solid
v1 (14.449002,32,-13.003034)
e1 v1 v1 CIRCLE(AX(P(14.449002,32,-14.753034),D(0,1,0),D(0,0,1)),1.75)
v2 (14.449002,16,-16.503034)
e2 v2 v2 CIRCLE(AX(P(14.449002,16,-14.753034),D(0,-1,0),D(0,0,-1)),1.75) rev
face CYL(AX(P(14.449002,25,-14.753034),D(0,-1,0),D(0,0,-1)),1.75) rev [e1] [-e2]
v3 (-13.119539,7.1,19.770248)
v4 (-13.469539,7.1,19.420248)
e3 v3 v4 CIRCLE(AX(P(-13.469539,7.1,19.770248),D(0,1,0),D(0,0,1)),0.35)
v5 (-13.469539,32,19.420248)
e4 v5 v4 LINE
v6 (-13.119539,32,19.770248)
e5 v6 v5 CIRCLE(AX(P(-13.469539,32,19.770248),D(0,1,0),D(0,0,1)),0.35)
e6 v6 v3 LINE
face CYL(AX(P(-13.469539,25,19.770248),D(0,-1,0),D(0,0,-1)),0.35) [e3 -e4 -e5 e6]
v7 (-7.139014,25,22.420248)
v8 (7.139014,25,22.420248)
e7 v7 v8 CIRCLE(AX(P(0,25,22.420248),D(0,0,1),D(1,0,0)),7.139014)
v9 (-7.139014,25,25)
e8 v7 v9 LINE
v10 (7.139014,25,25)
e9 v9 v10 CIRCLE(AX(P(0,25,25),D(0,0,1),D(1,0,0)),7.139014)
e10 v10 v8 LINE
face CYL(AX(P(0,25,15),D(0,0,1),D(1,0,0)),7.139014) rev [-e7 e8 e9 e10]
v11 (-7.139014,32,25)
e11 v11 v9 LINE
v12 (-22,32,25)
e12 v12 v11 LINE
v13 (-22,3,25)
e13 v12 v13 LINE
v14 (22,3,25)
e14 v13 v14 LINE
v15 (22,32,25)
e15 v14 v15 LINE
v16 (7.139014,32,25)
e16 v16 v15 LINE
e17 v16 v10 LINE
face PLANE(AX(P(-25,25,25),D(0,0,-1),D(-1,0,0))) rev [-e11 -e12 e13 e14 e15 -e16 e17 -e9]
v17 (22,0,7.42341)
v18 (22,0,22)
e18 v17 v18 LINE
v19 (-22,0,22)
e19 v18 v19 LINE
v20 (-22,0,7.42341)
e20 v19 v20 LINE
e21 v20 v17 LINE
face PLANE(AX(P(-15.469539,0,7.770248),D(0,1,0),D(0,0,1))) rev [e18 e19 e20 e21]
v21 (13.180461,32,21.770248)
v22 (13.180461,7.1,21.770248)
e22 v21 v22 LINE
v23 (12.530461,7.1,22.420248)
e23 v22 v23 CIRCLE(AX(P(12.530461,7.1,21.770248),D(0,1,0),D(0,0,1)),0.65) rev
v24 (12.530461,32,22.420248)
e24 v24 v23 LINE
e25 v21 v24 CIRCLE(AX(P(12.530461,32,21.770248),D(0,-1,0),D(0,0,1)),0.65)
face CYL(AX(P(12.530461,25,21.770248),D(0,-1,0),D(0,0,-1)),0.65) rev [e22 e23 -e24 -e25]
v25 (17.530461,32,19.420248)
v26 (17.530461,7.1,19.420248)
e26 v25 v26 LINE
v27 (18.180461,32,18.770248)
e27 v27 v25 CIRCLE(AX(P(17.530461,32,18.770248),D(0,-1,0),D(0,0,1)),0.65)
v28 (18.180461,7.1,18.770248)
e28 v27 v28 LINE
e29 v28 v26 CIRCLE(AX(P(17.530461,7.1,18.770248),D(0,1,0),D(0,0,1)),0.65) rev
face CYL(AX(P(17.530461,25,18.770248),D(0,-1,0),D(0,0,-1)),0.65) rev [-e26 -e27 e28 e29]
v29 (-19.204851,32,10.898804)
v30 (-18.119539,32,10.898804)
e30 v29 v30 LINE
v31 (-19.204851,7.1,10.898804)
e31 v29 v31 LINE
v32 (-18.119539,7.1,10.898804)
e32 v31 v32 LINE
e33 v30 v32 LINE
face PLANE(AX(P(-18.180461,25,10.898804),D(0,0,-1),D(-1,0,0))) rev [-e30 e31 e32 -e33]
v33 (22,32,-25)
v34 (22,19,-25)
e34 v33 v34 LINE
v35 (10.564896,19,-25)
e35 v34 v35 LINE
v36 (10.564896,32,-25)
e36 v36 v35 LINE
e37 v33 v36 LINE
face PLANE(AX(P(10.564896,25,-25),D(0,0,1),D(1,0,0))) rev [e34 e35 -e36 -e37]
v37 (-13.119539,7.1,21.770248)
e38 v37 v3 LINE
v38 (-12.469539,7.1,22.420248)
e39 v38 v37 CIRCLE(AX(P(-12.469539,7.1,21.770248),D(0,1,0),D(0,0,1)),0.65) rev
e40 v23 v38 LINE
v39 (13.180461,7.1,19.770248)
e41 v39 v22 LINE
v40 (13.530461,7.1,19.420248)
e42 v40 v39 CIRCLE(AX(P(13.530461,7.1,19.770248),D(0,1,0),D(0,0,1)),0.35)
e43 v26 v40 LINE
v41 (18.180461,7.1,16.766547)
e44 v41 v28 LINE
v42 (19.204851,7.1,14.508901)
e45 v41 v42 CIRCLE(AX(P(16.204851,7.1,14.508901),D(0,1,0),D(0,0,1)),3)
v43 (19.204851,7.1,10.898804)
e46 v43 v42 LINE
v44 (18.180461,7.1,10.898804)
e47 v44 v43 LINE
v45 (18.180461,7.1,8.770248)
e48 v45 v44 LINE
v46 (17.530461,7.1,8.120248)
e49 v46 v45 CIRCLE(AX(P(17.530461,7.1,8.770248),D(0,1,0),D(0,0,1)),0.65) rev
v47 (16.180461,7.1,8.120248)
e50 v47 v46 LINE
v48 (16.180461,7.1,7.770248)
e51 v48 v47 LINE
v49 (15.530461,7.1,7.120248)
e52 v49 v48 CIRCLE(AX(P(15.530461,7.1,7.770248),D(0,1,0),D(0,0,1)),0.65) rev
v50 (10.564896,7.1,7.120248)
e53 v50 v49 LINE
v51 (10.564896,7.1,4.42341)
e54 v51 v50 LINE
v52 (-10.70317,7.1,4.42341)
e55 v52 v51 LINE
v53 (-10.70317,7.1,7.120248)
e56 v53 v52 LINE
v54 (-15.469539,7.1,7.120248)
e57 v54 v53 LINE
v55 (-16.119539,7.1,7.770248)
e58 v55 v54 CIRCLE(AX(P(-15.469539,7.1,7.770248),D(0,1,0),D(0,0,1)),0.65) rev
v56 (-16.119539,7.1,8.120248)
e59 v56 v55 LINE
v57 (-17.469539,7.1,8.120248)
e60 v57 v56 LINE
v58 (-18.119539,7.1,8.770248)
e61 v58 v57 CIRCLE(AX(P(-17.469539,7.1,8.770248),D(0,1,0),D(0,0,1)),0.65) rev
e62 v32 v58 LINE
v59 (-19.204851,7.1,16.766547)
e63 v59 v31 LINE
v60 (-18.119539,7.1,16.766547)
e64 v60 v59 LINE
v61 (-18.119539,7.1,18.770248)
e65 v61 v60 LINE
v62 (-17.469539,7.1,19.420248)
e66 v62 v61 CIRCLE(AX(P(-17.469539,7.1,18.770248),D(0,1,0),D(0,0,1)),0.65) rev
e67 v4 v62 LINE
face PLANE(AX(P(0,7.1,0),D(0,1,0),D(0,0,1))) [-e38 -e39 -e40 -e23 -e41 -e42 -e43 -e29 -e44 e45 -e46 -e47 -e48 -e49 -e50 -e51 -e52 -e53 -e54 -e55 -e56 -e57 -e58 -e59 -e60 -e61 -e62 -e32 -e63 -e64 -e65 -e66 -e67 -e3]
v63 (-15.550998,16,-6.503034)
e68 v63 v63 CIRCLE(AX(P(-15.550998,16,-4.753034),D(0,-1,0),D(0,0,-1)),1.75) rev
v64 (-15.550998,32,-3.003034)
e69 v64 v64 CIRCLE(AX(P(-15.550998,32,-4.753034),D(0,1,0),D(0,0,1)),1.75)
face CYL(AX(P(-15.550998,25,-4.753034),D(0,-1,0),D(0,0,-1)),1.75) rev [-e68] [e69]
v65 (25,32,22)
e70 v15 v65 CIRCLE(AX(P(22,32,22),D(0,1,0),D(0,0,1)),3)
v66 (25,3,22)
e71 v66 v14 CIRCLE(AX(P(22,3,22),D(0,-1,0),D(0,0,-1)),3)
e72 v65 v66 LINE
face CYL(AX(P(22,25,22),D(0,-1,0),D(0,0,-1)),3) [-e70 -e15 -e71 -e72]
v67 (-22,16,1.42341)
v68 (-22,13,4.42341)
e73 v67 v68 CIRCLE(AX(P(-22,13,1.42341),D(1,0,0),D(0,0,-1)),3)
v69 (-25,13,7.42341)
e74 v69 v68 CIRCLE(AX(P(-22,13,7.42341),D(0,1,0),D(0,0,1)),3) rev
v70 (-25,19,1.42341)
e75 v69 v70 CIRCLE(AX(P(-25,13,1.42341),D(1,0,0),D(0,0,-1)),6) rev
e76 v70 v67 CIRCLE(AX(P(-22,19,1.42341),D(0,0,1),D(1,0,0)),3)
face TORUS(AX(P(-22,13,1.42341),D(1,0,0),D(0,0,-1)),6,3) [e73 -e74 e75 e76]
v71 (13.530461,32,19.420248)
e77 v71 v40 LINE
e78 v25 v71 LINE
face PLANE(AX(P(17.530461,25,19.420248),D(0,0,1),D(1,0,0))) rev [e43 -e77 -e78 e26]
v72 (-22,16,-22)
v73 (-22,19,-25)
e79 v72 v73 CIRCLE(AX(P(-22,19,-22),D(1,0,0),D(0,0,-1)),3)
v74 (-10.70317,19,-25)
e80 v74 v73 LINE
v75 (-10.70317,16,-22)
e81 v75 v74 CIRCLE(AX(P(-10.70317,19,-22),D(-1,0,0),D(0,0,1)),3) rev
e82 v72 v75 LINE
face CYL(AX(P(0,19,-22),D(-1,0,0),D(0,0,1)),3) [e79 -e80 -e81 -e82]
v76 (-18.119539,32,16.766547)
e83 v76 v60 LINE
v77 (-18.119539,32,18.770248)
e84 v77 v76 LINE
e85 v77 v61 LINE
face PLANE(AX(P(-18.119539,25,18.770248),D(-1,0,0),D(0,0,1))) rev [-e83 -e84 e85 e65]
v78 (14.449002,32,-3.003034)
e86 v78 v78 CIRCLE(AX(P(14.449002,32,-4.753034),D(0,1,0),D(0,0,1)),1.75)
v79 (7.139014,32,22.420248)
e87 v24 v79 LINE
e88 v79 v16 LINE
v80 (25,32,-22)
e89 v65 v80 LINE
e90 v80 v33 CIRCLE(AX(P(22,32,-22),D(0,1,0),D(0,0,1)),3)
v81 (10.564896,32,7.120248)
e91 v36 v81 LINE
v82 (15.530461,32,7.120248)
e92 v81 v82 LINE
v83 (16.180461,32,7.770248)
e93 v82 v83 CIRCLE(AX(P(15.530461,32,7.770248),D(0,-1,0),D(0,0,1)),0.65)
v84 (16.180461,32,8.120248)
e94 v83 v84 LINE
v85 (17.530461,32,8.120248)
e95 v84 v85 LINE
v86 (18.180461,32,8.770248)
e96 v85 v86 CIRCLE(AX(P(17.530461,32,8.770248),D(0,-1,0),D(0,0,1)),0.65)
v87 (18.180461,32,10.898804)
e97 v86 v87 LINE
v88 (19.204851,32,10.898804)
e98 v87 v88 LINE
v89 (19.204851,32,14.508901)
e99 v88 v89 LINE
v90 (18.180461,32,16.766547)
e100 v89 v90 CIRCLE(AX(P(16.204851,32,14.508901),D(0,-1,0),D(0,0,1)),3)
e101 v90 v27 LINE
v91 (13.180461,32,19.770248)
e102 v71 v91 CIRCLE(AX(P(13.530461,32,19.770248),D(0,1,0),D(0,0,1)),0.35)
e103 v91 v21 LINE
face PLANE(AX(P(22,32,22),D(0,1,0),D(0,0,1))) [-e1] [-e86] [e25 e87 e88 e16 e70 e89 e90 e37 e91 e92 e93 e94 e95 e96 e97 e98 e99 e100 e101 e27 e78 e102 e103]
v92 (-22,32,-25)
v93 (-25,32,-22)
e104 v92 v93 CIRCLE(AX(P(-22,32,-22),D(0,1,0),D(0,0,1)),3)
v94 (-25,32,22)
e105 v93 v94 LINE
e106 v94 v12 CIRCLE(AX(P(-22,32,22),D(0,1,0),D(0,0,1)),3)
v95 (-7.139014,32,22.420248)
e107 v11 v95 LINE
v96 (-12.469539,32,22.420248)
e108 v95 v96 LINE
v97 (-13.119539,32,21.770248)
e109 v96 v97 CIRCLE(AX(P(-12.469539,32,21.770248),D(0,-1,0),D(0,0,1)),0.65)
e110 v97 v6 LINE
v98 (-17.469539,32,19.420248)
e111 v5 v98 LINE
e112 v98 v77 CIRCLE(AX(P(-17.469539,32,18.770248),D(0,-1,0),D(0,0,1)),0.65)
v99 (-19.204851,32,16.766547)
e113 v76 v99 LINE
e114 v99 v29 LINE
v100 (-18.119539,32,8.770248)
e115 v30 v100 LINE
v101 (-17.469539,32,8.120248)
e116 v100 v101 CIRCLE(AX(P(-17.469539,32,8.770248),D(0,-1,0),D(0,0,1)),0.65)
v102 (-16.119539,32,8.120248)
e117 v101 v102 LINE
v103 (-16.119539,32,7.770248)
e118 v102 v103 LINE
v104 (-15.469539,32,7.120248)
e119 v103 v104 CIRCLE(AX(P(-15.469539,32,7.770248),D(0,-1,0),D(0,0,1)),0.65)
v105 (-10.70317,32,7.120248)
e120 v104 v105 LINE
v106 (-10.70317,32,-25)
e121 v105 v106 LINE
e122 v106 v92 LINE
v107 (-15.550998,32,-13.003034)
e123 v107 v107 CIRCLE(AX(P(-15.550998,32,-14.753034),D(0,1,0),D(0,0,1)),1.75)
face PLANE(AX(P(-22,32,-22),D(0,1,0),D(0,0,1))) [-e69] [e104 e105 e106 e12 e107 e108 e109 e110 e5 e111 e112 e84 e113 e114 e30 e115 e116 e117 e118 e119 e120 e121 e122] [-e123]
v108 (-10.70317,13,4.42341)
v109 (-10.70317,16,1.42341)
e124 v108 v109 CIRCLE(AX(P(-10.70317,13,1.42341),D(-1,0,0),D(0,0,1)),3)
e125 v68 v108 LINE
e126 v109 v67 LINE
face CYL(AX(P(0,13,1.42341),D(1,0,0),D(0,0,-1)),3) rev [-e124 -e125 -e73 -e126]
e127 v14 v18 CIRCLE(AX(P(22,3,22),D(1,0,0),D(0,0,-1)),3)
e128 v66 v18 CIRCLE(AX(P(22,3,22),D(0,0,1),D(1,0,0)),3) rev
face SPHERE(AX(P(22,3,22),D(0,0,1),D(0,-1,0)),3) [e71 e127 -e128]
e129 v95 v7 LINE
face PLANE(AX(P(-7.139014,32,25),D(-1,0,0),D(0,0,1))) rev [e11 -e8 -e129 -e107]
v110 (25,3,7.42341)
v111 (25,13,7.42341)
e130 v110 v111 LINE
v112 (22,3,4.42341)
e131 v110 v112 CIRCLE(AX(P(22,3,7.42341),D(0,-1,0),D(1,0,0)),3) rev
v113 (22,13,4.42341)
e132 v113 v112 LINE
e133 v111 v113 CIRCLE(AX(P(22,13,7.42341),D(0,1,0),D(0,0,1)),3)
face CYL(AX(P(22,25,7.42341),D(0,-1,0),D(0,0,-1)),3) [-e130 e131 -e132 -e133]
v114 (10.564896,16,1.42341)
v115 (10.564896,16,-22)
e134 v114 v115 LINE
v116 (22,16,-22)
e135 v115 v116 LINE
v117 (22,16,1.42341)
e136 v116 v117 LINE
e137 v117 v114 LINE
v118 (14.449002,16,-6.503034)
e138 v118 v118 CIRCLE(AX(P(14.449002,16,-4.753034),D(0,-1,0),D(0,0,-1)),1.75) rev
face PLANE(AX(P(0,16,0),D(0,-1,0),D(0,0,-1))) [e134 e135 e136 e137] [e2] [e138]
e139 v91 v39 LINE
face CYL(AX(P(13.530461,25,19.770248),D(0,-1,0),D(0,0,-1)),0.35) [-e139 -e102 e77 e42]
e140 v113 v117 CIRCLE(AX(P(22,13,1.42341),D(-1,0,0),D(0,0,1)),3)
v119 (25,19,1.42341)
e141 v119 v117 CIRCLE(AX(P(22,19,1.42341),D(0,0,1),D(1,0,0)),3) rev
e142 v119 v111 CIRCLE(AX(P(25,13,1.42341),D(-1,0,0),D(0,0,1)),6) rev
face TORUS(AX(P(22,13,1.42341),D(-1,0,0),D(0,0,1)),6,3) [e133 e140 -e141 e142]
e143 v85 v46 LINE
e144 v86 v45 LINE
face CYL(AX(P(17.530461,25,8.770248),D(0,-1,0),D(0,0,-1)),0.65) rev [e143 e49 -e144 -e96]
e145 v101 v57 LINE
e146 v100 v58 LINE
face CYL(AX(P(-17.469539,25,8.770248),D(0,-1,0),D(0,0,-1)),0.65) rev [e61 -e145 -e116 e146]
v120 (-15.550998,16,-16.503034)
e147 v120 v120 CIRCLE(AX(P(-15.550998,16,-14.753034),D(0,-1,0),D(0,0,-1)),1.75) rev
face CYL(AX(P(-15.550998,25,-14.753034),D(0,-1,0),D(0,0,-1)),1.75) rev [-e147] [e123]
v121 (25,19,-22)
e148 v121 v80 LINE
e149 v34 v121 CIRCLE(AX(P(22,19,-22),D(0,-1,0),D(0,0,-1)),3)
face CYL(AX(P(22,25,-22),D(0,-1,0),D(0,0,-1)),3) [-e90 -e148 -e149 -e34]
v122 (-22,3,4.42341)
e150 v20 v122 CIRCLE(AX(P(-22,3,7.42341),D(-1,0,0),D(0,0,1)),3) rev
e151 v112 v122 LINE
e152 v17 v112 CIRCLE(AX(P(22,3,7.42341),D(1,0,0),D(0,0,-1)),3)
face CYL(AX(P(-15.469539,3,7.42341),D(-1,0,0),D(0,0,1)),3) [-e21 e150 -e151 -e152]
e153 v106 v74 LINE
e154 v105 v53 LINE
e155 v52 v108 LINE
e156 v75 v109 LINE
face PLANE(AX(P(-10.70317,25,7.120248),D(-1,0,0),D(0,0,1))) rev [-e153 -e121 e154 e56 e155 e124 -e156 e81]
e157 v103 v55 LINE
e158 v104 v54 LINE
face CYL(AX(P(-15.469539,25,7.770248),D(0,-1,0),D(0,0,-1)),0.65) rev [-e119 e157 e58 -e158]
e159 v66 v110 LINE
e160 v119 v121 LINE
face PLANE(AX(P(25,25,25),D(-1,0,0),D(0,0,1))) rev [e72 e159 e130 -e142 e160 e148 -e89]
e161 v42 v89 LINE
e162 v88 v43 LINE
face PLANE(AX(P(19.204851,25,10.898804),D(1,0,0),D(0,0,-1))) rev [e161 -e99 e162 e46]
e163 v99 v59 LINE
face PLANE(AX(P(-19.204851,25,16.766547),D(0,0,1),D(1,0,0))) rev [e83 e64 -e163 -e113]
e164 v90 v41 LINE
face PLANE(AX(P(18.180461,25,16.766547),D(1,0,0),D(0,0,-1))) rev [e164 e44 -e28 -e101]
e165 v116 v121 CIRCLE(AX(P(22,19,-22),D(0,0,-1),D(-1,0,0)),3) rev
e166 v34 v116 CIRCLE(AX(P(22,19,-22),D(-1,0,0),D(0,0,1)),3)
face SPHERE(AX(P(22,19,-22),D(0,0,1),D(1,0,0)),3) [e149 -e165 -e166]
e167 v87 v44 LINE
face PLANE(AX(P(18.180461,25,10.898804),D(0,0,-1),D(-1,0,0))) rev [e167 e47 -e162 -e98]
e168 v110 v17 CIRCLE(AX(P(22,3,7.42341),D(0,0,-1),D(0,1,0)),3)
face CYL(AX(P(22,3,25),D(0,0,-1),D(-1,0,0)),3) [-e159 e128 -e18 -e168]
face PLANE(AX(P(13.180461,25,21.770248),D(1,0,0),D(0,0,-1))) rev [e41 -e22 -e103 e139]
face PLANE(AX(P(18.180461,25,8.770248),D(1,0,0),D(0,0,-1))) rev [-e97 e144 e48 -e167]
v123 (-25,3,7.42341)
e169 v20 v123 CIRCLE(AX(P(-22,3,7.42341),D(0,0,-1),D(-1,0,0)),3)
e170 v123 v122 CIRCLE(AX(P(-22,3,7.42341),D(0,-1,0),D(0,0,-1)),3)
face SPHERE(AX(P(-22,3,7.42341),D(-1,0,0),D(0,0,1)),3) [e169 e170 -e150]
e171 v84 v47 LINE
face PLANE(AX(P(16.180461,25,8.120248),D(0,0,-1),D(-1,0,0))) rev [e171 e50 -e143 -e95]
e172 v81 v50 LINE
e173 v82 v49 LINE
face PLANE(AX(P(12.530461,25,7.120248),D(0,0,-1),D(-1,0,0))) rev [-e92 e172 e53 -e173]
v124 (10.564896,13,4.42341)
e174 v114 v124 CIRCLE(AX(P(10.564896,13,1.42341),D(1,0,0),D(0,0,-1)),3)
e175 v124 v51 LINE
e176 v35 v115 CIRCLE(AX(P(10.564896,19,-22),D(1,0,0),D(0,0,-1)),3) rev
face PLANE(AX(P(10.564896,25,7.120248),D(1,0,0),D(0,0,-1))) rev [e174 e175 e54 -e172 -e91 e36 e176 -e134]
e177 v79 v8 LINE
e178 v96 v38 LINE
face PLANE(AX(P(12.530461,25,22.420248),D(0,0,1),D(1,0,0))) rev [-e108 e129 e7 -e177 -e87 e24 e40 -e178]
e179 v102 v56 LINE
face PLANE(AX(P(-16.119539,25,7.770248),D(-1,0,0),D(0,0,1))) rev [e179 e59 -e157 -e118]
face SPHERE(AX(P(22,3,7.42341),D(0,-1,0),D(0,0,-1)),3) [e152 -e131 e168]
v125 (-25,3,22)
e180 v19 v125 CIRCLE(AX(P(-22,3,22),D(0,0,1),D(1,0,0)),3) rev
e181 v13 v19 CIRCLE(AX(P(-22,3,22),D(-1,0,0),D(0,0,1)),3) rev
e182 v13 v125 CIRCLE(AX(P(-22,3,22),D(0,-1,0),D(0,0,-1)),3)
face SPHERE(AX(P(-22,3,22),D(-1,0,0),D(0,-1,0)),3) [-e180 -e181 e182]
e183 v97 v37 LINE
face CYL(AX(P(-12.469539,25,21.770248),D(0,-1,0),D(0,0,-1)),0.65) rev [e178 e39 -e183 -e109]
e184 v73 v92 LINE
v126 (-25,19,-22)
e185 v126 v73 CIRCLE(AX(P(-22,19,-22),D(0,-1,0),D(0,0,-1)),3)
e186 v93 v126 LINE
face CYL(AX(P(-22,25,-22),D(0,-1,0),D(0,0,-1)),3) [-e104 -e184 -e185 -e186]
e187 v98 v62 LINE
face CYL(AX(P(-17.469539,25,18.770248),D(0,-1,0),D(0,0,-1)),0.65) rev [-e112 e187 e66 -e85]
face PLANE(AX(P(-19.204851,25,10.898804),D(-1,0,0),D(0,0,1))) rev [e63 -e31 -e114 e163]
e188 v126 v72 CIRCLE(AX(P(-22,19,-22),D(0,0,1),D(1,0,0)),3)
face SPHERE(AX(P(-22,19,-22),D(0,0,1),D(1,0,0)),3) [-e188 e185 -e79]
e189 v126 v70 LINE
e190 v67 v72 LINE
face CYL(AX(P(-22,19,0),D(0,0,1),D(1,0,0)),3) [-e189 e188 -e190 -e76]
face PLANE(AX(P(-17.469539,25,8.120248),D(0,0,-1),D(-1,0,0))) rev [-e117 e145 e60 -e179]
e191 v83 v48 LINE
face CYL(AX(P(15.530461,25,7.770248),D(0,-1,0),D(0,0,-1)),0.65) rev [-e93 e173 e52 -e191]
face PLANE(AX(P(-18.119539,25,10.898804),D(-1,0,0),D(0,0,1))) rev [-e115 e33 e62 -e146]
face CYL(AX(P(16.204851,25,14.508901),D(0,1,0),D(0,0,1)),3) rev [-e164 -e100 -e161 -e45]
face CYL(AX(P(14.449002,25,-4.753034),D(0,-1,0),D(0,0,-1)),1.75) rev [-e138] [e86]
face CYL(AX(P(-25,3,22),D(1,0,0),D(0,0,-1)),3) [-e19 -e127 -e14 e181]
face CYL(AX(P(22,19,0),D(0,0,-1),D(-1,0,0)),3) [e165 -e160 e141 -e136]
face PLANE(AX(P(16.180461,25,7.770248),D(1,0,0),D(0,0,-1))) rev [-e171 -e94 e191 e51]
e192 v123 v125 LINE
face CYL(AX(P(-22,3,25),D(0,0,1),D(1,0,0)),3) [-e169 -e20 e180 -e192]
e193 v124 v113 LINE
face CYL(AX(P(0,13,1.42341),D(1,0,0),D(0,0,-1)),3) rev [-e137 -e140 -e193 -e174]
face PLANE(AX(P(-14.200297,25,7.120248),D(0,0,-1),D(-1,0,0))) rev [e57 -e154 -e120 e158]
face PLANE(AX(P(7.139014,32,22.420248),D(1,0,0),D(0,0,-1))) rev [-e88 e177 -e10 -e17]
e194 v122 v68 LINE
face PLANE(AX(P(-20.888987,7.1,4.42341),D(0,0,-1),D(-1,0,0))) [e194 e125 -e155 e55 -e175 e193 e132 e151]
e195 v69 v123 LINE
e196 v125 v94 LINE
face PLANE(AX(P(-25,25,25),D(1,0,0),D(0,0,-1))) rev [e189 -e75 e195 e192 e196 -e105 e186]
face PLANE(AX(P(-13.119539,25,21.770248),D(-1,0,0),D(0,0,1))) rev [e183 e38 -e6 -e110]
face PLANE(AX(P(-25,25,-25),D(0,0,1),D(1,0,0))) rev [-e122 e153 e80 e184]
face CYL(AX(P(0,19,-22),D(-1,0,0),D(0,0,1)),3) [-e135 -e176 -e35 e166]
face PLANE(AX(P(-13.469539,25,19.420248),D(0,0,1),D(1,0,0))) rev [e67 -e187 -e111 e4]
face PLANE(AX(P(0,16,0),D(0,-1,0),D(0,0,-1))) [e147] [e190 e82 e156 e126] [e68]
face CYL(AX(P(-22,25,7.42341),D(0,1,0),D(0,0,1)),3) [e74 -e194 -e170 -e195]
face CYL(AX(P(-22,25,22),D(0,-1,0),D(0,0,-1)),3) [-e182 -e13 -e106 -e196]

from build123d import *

# Parameters (mm, degrees)
EXTRUDE_1_DEPTH     = 25
CUT_EXTRUDE_1_DEPTH = 10
SKETCH_5_W          = 41.777974616
SKETCH_5_H          = 18.894782553
EXTRUDE_4_DEPTH     = 7.1
SKETCH_6_R          = 1.75
CUT_EXTRUDE_2_DEPTH = 44.301270189
CUT_EXTRUDE_3_DEPTH = 16
FILLET_1_R          = 3
FILLET_3_R          = 3
EXTRUDE_5_DEPTH     = 7
CUT_EXTRUDE_START   = -17
SKETCH_11_R         = 1.75
CUT_EXTRUDE_4_DEPTH = 17
SKETCH_10_R         = 1.75
CUT_EXTRUDE_5_DEPTH = 17


with BuildPart() as part:
    # 草图1 → 凸台-拉伸1 (new body)
    with BuildSketch(Plane(origin=(0, 0, 0), x_dir=(1, 0, 0), z_dir=(0, 1, 0))):
        with BuildLine():
            Line((-25, -25), (25, -25))
            Line((25, -25), (25, 25))
            Line((25, 25), (12.530461135, 25))
            Line((12.530461135, 25), (10.564896285, 25))
            Line((10.564896285, 25), (10.564896285, -7.120248206))
            Line((10.564896285, -7.120248206), (12.530461135, -7.120248206))
            Line((12.530461135, -7.120248206), (15.530461135, -7.120248206))
            ThreePointArc((15.530461135, -7.120248206), (15.990080543, -7.310628798), (16.180461135, -7.770248206))
            Line((16.180461135, -7.770248206), (16.180461135, -8.120248206))
            Line((16.180461135, -8.120248206), (17.530461135, -8.120248206))
            ThreePointArc((17.530461135, -8.120248206), (17.990080543, -8.310628798), (18.180461135, -8.770248206))
            Line((18.180461135, -8.770248206), (18.180461135, -10.898803743))
            Line((18.180461135, -10.898803743), (19.204850948, -10.898803743))
            Line((19.204850948, -10.898803743), (19.204850948, -16.766546625))
            Line((19.204850948, -16.766546625), (18.180461135, -16.766546625))
            Line((18.180461135, -16.766546625), (18.180461135, -18.770248206))
            ThreePointArc((18.180461135, -18.770248206), (17.990080543, -19.229867614), (17.530461135, -19.420248206))
            Line((17.530461135, -19.420248206), (13.530461135, -19.420248206))
            ThreePointArc((13.530461135, -19.420248206), (13.282973762, -19.522760833), (13.180461135, -19.770248206))
            Line((13.180461135, -19.770248206), (13.180461135, -21.770248206))
            ThreePointArc((13.180461135, -21.770248206), (12.990080543, -22.229867614), (12.530461135, -22.420248206))
            Line((12.530461135, -22.420248206), (-12.469538865, -22.420248206))
            ThreePointArc((-12.469538865, -22.420248206), (-12.929158272, -22.229867614), (-13.119538865, -21.770248206))
            Line((-13.119538865, -21.770248206), (-13.119538865, -19.770248206))
            ThreePointArc((-13.119538865, -19.770248206), (-13.222051491, -19.522760833), (-13.469538865, -19.420248206))
            Line((-13.469538865, -19.420248206), (-17.469538865, -19.420248206))
            ThreePointArc((-17.469538865, -19.420248206), (-17.929158272, -19.229867614), (-18.119538865, -18.770248206))
            Line((-18.119538865, -18.770248206), (-18.119538865, -16.766546625))
            Line((-18.119538865, -16.766546625), (-18.180461135, -16.766546625))
            Line((-18.180461135, -16.766546625), (-19.204850948, -16.766546625))
            Line((-19.204850948, -16.766546625), (-19.204850948, -10.898803743))
            Line((-19.204850948, -10.898803743), (-18.180461135, -10.898803743))
            Line((-18.180461135, -10.898803743), (-18.119538865, -10.898803743))
            Line((-18.119538865, -10.898803743), (-18.119538865, -8.770248206))
            ThreePointArc((-18.119538865, -8.770248206), (-17.929158272, -8.310628798), (-17.469538865, -8.120248206))
            Line((-17.469538865, -8.120248206), (-16.119538865, -8.120248206))
            Line((-16.119538865, -8.120248206), (-16.119538865, -7.770248206))
            ThreePointArc((-16.119538865, -7.770248206), (-15.929158272, -7.310628798), (-15.469538865, -7.120248206))
            Line((-15.469538865, -7.120248206), (-14.200297417, -7.120248206))
            Line((-14.200297417, -7.120248206), (-10.70316973, -7.120248206))
            Line((-10.70316973, -7.120248206), (-10.70316973, 25))
            Line((-10.70316973, 25), (-11.261897063, 25))
            Line((-11.261897063, 25), (-25, 25))
            Line((-25, 25), (-25, -25))
        make_face()
    extrude(amount=EXTRUDE_1_DEPTH)

    # 草图2 → 切除-拉伸1 (cut)
    with BuildSketch(Plane.XY.offset(25)):
        with BuildLine():
            Line((7.139013901, 25), (-7.139013901, 25))
            ThreePointArc((-7.139013901, 25), (0, 17.860986099), (7.139013901, 25))
        make_face()
    extrude(amount=-CUT_EXTRUDE_1_DEPTH, mode=Mode.SUBTRACT)

    # 草图5 → 凸台-拉伸4 (add)
    with BuildSketch(Plane.XZ):
        with Locations((0, 13.870801672)):
            Rectangle(SKETCH_5_W, SKETCH_5_H)
    extrude(amount=-EXTRUDE_4_DEPTH)

    # 草图6 → 切除-拉伸2 (cut, through all)
    with BuildSketch(Plane.XZ):
        with Locations(Location((-15.550997874, -4.753034163, 0), (0, 0, 270))):
            Circle(SKETCH_6_R)
        with Locations(Location((-15.550997874, -14.753034163, 0), (0, 0, 270))):
            Circle(SKETCH_6_R)
        with Locations(Location((14.449002126, -4.753034163, 0), (0, 0, 270))):
            Circle(SKETCH_6_R)
        with Locations(Location((14.449002126, -14.753034163, 0), (0, 0, 270))):
            Circle(SKETCH_6_R)
    extrude(amount=-CUT_EXTRUDE_2_DEPTH, mode=Mode.SUBTRACT)

    # 草图7 → 切除-拉伸3 (cut)
    with BuildSketch(Plane.XZ):
        Polygon((-10.70316973, 4.423410395), (-25, 4.423410395), (-25, -26.3625), (26.927678364, -26.3625), (26.927678364, 4.423410395), align=None)
    extrude(amount=-CUT_EXTRUDE_3_DEPTH, mode=Mode.SUBTRACT)

    # 圆角1
    # the kernel refuses this fillet: 3 mm, written as the material it adds along each edge
    with BuildSketch(Plane(origin=(19.204850948, 1.455885595, 16.766546625), x_dir=(0, 0, -1), z_dir=(0, 1, 0))) as fillet_1_piece_1:
        with BuildLine():
            CenterArc((2.257645762, 3), FILLET_1_R, 221.188370699, 48.811629301)
            Line((0, 1.024389812), (0, 0))
            Line((0, 0), (2.257645762, 0))
        make_face()
    extrude(amount=23.544114405)
    with BuildSketch(Plane(origin=(25, 16, 4.423410395), x_dir=(0, 0, -1), z_dir=(-1, 0, 0))) as fillet_1_piece_2:
        with BuildLine():
            CenterArc((FILLET_1_R, FILLET_1_R), FILLET_1_R, 180, 90)
            Line((0, FILLET_1_R), (0, 0))
            Line((0, 0), (FILLET_1_R, 0))
        make_face()
    extrude(amount=14.435103715)
    with BuildSketch(Plane(origin=(-10.70316973, 16, 4.423410395), x_dir=(0, -1, 0), z_dir=(-1, 0, 0))) as fillet_1_piece_3:
        with BuildLine():
            CenterArc((FILLET_1_R, -FILLET_1_R), FILLET_1_R, 90, 90)
            Line((0, -FILLET_1_R), (0, 0))
            Line((0, 0), (FILLET_1_R, 0))
        make_face()
    extrude(amount=14.29683027)
    # the kernel refuses this fillet: 3 mm, written as the material it takes off along each edge
    with BuildSketch(Plane(origin=(-22, 3, 22), x_dir=(0, -1, 0), z_dir=(0, 0, 1))) as fillet_1_2_piece_1_section:
        Polygon((0, 0), (FILLET_1_R * 1.02, 0), (FILLET_1_R * 1.02, -FILLET_1_R * 1.02), (0, -FILLET_1_R * 1.02), align=None)
    fillet_1_2_piece_1 = extrude(amount=FILLET_1_R * 1.02, mode=Mode.PRIVATE)
    fillet_1_2_piece_1 = fillet_1_2_piece_1 - Plane(origin=(-22, 3, 22), x_dir=(0.7071067811865475, 0.7071067811865475, 0), z_dir=(0, 0, 1)) * Sphere(FILLET_1_R, mode=Mode.PRIVATE)
    add(fillet_1_2_piece_1, mode=Mode.SUBTRACT)
    with BuildSketch(Plane(origin=(22, 3, 22), x_dir=(0, -1, 0), z_dir=(0, 0, 1))) as fillet_1_2_piece_2_section:
        Polygon((0, 0), (FILLET_1_R * 1.02, 0), (FILLET_1_R * 1.02, FILLET_1_R * 1.02), (0, FILLET_1_R * 1.02), align=None)
    fillet_1_2_piece_2 = extrude(amount=FILLET_1_R * 1.02, mode=Mode.PRIVATE)
    fillet_1_2_piece_2 = fillet_1_2_piece_2 - Plane(origin=(22, 3, 22), x_dir=(-0.7071067811865475, 0.7071067811865475, 0), z_dir=(0, 0, 1)) * Sphere(FILLET_1_R, mode=Mode.PRIVATE)
    add(fillet_1_2_piece_2, mode=Mode.SUBTRACT)
    with BuildSketch(Plane(origin=(-22, 0, 25), x_dir=(0, 1, 0), z_dir=(1, 0, 0))) as fillet_1_2_piece_3:
        with BuildLine():
            CenterArc((FILLET_1_R, -FILLET_1_R), FILLET_1_R, 90, 90)
            Line((0, -FILLET_1_R), (0, 0))
            Line((0, 0), (FILLET_1_R, 0))
        make_face()
    extrude(amount=44, mode=Mode.SUBTRACT)
    with BuildSketch(Plane(origin=(25, 0, 22), x_dir=(-1, 0, 0), z_dir=(0, 0, -1)), Plane(origin=(-25, 0, -3.076589605), x_dir=(1, 0, 0), z_dir=(0, 0, 1))) as fillet_1_2_piece_4:
        with BuildLine():
            CenterArc((FILLET_1_R, FILLET_1_R), FILLET_1_R, 180, 90)
            Line((0, FILLET_1_R), (0, 0))
            Line((0, 0), (FILLET_1_R, 0))
        make_face()
    extrude(amount=25.076589605, mode=Mode.SUBTRACT)
    with BuildSketch(Plane(origin=(-32.5, 0, 4.423410395), x_dir=(0, 0, 1), z_dir=(1, 0, 0))) as fillet_1_2_piece_5:
        with BuildLine():
            CenterArc((FILLET_1_R, -FILLET_1_R), FILLET_1_R, 90, 90)
            Line((0, -FILLET_1_R), (0, 0))
            Line((0, 0), (FILLET_1_R, 0))
        make_face()
    extrude(amount=65, mode=Mode.SUBTRACT)
    with BuildSketch(Plane(origin=(25, 3, 25), x_dir=(-1, 0, 0), z_dir=(0, 1, 0))) as fillet_1_2_piece_6:
        with BuildLine():
            CenterArc((FILLET_1_R, -FILLET_1_R), FILLET_1_R, 90, 90)
            Line((0, -FILLET_1_R), (0, 0))
            Line((0, 0), (FILLET_1_R, 0))
        make_face()
    extrude(amount=29.5, mode=Mode.SUBTRACT)
    with BuildSketch(Plane(origin=(-25, 3, 25), x_dir=(1, 0, 0), z_dir=(0, 1, 0))) as fillet_1_2_piece_7:
        with BuildLine():
            CenterArc((FILLET_1_R, FILLET_1_R), FILLET_1_R, 180, 90)
            Line((0, FILLET_1_R), (0, 0))
            Line((0, 0), (FILLET_1_R, 0))
        make_face()
    extrude(amount=29.5, mode=Mode.SUBTRACT)
    # the kernel refuses this fillet: 3 mm, written as the material it takes off along each edge
    with BuildSketch(Plane(origin=(-22, 3, 7.423410395), x_dir=(0, 0, -1), z_dir=(-1, 0, 0))) as fillet_1_3_piece_1_section:
        Polygon((0, 0), (FILLET_1_R * 1.02, 0), (FILLET_1_R * 1.02, FILLET_1_R * 1.02), (0, FILLET_1_R * 1.02), align=None)
    fillet_1_3_piece_1 = extrude(amount=FILLET_1_R * 1.02, mode=Mode.PRIVATE)
    fillet_1_3_piece_1 = fillet_1_3_piece_1 - Plane(origin=(-22, 3, 7.423410395), x_dir=(0, 0.7071067811865475, 0.7071067811865475), z_dir=(-1, 0, 0)) * Sphere(FILLET_1_R, mode=Mode.PRIVATE)
    add(fillet_1_3_piece_1, mode=Mode.SUBTRACT)
    with BuildSketch(Plane(origin=(22, 3, 7.423410395), x_dir=(0, 0, -1), z_dir=(1, 0, 0))) as fillet_1_3_piece_2_section:
        Polygon((0, 0), (FILLET_1_R * 1.02, 0), (FILLET_1_R * 1.02, -FILLET_1_R * 1.02), (0, -FILLET_1_R * 1.02), align=None)
    fillet_1_3_piece_2 = extrude(amount=FILLET_1_R * 1.02, mode=Mode.PRIVATE)
    fillet_1_3_piece_2 = fillet_1_3_piece_2 - Plane(origin=(22, 3, 7.423410395), x_dir=(0, 0.7071067811865475, 0.7071067811865475), z_dir=(1, 0, 0)) * Sphere(FILLET_1_R, mode=Mode.PRIVATE)
    add(fillet_1_3_piece_2, mode=Mode.SUBTRACT)
    with BuildSketch(Plane(origin=(25, 16, -32.5), x_dir=(0, 1, 0), z_dir=(0, 0, 1)), Plane(origin=(-25, 16, 1.423410395), x_dir=(0, 1, 0), z_dir=(0, 0, -1))) as fillet_1_3_piece_3:
        with BuildLine():
            CenterArc((FILLET_1_R, FILLET_1_R), FILLET_1_R, 180, 90)
            Line((0, FILLET_1_R), (0, 0))
            Line((0, 0), (FILLET_1_R, 0))
        make_face()
    extrude(amount=33.923410395, mode=Mode.SUBTRACT)
    with BuildSketch(Plane(origin=(25, 3, 4.423410395), x_dir=(0, 0, 1), z_dir=(0, 1, 0))) as fillet_1_3_piece_4:
        with BuildLine():
            CenterArc((FILLET_1_R, -FILLET_1_R), FILLET_1_R, 90, 90)
            Line((0, -FILLET_1_R), (0, 0))
            Line((0, 0), (FILLET_1_R, 0))
        make_face()
    extrude(amount=10, mode=Mode.SUBTRACT)
    with BuildSketch(Plane(origin=(-25, 3, 4.423410395), x_dir=(0, 0, 1), z_dir=(0, 1, 0))) as fillet_1_3_piece_5:
        with BuildLine():
            CenterArc((FILLET_1_R, FILLET_1_R), FILLET_1_R, 180, 90)
            Line((0, FILLET_1_R), (0, 0))
            Line((0, 0), (FILLET_1_R, 0))
        make_face()
    extrude(amount=10, mode=Mode.SUBTRACT)
    with BuildSketch(Plane(origin=(-25, 13, 1.423410395), x_dir=(0, 0, 1), z_dir=(0, -1, 0))) as fillet_1_3_piece_6:
        with BuildLine():
            CenterArc((3 + FILLET_1_R, -FILLET_1_R), FILLET_1_R, 90, 90)
            Line((3, -FILLET_1_R), (3, 0))
            Line((3, 0), (3 + FILLET_1_R, 0))
        make_face()
    revolve(axis=Axis((-25, 13, 1.423410395), (-1, 0, 0)), revolution_arc=90, mode=Mode.SUBTRACT)
    with BuildSketch(Plane(origin=(25, 13, 1.423410395), x_dir=(0, 1, 0), z_dir=(0, 0, -1))) as fillet_1_3_piece_7:
        with BuildLine():
            CenterArc((3 + FILLET_1_R, -FILLET_1_R), FILLET_1_R, 90, 90)
            Line((3, -FILLET_1_R), (3, 0))
            Line((3, 0), (3 + FILLET_1_R, 0))
        make_face()
    revolve(axis=Axis((25, 13, 1.423410395), (1, 0, 0)), revolution_arc=90, mode=Mode.SUBTRACT)

    # 圆角3
    fillet_3_edges = [part.edges().sort_by_distance(p)[0] for p in [
        (16.282448142, 16, -25),
        (24.121320344, 16.878679656, -25),
        (-16.351584865, 16, -25),
        (-24.121320344, 16.878679656, -25),
        (25, 22, -25),
        (-25, 22, -25),
    ]]
    fillet(fillet_3_edges, radius=FILLET_3_R)

    # 草图8 → 凸台-拉伸5 (add)
    with BuildSketch(Plane(origin=(0, 25, 0), x_dir=(1, 0, 0), z_dir=(0, 1, 0))):
        with BuildLine():
            Line((25, -22), (25, 22))
            ThreePointArc((25, 22), (24.121320344, 24.121320344), (22, 25))
            Line((22, 25), (10.564896285, 25))
            Line((10.564896285, 25), (10.564896285, -7.120248206))
            Line((10.564896285, -7.120248206), (15.530461135, -7.120248206))
            ThreePointArc((15.530461135, -7.120248206), (15.990080543, -7.310628798), (16.180461135, -7.770248206))
            Line((16.180461135, -7.770248206), (16.180461135, -8.120248206))
            Line((16.180461135, -8.120248206), (17.530461135, -8.120248206))
            ThreePointArc((17.530461135, -8.120248206), (17.990080543, -8.310628798), (18.180461135, -8.770248206))
            Line((18.180461135, -8.770248206), (18.180461135, -10.898803743))
            Line((18.180461135, -10.898803743), (19.204850948, -10.898803743))
            Line((19.204850948, -10.898803743), (19.204850948, -14.508900863))
            ThreePointArc((19.204850948, -14.508900863), (18.936776145, -15.748491407), (18.180461135, -16.766546625))
            Line((18.180461135, -16.766546625), (18.180461135, -18.770248206))
            ThreePointArc((18.180461135, -18.770248206), (17.990080543, -19.229867614), (17.530461135, -19.420248206))
            Line((17.530461135, -19.420248206), (13.530461135, -19.420248206))
            ThreePointArc((13.530461135, -19.420248206), (13.282973762, -19.522760833), (13.180461135, -19.770248206))
            Line((13.180461135, -19.770248206), (13.180461135, -21.770248206))
            ThreePointArc((13.180461135, -21.770248206), (12.990080543, -22.229867614), (12.530461135, -22.420248206))
            Line((12.530461135, -22.420248206), (7.139013901, -22.420248206))
            Line((7.139013901, -22.420248206), (7.139013901, -25))
            Line((7.139013901, -25), (22, -25))
            ThreePointArc((22, -25), (24.121320344, -24.121320344), (25, -22))
        make_face()
        with BuildLine():
            Line((-10.70316973, 25), (-22, 25))
            ThreePointArc((-22, 25), (-24.121320344, 24.121320344), (-25, 22))
            Line((-25, 22), (-25, -22))
            ThreePointArc((-25, -22), (-24.121320344, -24.121320344), (-22, -25))
            Line((-22, -25), (-7.139013901, -25))
            Line((-7.139013901, -25), (-7.139013901, -22.420248206))
            Line((-7.139013901, -22.420248206), (-12.469538865, -22.420248206))
            ThreePointArc((-12.469538865, -22.420248206), (-12.929158272, -22.229867614), (-13.119538865, -21.770248206))
            Line((-13.119538865, -21.770248206), (-13.119538865, -19.770248206))
            ThreePointArc((-13.119538865, -19.770248206), (-13.222051491, -19.522760833), (-13.469538865, -19.420248206))
            Line((-13.469538865, -19.420248206), (-17.469538865, -19.420248206))
            ThreePointArc((-17.469538865, -19.420248206), (-17.929158272, -19.229867614), (-18.119538865, -18.770248206))
            Line((-18.119538865, -18.770248206), (-18.119538865, -16.766546625))
            Line((-18.119538865, -16.766546625), (-19.204850948, -16.766546625))
            Line((-19.204850948, -16.766546625), (-19.204850948, -10.898803743))
            Line((-19.204850948, -10.898803743), (-18.119538865, -10.898803743))
            Line((-18.119538865, -10.898803743), (-18.119538865, -8.770248206))
            ThreePointArc((-18.119538865, -8.770248206), (-17.929158272, -8.310628798), (-17.469538865, -8.120248206))
            Line((-17.469538865, -8.120248206), (-16.119538865, -8.120248206))
            Line((-16.119538865, -8.120248206), (-16.119538865, -7.770248206))
            ThreePointArc((-16.119538865, -7.770248206), (-15.929158272, -7.310628798), (-15.469538865, -7.120248206))
            Line((-15.469538865, -7.120248206), (-10.70316973, -7.120248206))
            Line((-10.70316973, -7.120248206), (-10.70316973, 25))
        make_face()
    extrude(amount=EXTRUDE_5_DEPTH)

    # 草图11 → 切除-拉伸4 (cut)
    with BuildSketch(Plane(origin=(0, 32, 0), x_dir=(1, 0, 0), z_dir=(0, 1, 0)).offset(CUT_EXTRUDE_START)):
        with Locations(Location((14.449002126, 4.753034163, 0), (0, 0, 90))):
            Circle(SKETCH_11_R)
        with Locations(Location((14.449002126, 14.753034163, 0), (0, 0, 90))):
            Circle(SKETCH_11_R)
    extrude(amount=CUT_EXTRUDE_4_DEPTH, mode=Mode.SUBTRACT)

    # 草图10 → 切除-拉伸5 (cut)
    with BuildSketch(Plane(origin=(0, 32, 0), x_dir=(1, 0, 0), z_dir=(0, 1, 0)).offset(CUT_EXTRUDE_START)):
        with Locations(Location((-15.550997874, 4.753034163, 0), (0, 0, 90))):
            Circle(SKETCH_10_R)
        with Locations(Location((-15.550997874, 14.753034163, 0), (0, 0, 90))):
            Circle(SKETCH_10_R)
    extrude(amount=CUT_EXTRUDE_5_DEPTH, mode=Mode.SUBTRACT)


solid = part.part
